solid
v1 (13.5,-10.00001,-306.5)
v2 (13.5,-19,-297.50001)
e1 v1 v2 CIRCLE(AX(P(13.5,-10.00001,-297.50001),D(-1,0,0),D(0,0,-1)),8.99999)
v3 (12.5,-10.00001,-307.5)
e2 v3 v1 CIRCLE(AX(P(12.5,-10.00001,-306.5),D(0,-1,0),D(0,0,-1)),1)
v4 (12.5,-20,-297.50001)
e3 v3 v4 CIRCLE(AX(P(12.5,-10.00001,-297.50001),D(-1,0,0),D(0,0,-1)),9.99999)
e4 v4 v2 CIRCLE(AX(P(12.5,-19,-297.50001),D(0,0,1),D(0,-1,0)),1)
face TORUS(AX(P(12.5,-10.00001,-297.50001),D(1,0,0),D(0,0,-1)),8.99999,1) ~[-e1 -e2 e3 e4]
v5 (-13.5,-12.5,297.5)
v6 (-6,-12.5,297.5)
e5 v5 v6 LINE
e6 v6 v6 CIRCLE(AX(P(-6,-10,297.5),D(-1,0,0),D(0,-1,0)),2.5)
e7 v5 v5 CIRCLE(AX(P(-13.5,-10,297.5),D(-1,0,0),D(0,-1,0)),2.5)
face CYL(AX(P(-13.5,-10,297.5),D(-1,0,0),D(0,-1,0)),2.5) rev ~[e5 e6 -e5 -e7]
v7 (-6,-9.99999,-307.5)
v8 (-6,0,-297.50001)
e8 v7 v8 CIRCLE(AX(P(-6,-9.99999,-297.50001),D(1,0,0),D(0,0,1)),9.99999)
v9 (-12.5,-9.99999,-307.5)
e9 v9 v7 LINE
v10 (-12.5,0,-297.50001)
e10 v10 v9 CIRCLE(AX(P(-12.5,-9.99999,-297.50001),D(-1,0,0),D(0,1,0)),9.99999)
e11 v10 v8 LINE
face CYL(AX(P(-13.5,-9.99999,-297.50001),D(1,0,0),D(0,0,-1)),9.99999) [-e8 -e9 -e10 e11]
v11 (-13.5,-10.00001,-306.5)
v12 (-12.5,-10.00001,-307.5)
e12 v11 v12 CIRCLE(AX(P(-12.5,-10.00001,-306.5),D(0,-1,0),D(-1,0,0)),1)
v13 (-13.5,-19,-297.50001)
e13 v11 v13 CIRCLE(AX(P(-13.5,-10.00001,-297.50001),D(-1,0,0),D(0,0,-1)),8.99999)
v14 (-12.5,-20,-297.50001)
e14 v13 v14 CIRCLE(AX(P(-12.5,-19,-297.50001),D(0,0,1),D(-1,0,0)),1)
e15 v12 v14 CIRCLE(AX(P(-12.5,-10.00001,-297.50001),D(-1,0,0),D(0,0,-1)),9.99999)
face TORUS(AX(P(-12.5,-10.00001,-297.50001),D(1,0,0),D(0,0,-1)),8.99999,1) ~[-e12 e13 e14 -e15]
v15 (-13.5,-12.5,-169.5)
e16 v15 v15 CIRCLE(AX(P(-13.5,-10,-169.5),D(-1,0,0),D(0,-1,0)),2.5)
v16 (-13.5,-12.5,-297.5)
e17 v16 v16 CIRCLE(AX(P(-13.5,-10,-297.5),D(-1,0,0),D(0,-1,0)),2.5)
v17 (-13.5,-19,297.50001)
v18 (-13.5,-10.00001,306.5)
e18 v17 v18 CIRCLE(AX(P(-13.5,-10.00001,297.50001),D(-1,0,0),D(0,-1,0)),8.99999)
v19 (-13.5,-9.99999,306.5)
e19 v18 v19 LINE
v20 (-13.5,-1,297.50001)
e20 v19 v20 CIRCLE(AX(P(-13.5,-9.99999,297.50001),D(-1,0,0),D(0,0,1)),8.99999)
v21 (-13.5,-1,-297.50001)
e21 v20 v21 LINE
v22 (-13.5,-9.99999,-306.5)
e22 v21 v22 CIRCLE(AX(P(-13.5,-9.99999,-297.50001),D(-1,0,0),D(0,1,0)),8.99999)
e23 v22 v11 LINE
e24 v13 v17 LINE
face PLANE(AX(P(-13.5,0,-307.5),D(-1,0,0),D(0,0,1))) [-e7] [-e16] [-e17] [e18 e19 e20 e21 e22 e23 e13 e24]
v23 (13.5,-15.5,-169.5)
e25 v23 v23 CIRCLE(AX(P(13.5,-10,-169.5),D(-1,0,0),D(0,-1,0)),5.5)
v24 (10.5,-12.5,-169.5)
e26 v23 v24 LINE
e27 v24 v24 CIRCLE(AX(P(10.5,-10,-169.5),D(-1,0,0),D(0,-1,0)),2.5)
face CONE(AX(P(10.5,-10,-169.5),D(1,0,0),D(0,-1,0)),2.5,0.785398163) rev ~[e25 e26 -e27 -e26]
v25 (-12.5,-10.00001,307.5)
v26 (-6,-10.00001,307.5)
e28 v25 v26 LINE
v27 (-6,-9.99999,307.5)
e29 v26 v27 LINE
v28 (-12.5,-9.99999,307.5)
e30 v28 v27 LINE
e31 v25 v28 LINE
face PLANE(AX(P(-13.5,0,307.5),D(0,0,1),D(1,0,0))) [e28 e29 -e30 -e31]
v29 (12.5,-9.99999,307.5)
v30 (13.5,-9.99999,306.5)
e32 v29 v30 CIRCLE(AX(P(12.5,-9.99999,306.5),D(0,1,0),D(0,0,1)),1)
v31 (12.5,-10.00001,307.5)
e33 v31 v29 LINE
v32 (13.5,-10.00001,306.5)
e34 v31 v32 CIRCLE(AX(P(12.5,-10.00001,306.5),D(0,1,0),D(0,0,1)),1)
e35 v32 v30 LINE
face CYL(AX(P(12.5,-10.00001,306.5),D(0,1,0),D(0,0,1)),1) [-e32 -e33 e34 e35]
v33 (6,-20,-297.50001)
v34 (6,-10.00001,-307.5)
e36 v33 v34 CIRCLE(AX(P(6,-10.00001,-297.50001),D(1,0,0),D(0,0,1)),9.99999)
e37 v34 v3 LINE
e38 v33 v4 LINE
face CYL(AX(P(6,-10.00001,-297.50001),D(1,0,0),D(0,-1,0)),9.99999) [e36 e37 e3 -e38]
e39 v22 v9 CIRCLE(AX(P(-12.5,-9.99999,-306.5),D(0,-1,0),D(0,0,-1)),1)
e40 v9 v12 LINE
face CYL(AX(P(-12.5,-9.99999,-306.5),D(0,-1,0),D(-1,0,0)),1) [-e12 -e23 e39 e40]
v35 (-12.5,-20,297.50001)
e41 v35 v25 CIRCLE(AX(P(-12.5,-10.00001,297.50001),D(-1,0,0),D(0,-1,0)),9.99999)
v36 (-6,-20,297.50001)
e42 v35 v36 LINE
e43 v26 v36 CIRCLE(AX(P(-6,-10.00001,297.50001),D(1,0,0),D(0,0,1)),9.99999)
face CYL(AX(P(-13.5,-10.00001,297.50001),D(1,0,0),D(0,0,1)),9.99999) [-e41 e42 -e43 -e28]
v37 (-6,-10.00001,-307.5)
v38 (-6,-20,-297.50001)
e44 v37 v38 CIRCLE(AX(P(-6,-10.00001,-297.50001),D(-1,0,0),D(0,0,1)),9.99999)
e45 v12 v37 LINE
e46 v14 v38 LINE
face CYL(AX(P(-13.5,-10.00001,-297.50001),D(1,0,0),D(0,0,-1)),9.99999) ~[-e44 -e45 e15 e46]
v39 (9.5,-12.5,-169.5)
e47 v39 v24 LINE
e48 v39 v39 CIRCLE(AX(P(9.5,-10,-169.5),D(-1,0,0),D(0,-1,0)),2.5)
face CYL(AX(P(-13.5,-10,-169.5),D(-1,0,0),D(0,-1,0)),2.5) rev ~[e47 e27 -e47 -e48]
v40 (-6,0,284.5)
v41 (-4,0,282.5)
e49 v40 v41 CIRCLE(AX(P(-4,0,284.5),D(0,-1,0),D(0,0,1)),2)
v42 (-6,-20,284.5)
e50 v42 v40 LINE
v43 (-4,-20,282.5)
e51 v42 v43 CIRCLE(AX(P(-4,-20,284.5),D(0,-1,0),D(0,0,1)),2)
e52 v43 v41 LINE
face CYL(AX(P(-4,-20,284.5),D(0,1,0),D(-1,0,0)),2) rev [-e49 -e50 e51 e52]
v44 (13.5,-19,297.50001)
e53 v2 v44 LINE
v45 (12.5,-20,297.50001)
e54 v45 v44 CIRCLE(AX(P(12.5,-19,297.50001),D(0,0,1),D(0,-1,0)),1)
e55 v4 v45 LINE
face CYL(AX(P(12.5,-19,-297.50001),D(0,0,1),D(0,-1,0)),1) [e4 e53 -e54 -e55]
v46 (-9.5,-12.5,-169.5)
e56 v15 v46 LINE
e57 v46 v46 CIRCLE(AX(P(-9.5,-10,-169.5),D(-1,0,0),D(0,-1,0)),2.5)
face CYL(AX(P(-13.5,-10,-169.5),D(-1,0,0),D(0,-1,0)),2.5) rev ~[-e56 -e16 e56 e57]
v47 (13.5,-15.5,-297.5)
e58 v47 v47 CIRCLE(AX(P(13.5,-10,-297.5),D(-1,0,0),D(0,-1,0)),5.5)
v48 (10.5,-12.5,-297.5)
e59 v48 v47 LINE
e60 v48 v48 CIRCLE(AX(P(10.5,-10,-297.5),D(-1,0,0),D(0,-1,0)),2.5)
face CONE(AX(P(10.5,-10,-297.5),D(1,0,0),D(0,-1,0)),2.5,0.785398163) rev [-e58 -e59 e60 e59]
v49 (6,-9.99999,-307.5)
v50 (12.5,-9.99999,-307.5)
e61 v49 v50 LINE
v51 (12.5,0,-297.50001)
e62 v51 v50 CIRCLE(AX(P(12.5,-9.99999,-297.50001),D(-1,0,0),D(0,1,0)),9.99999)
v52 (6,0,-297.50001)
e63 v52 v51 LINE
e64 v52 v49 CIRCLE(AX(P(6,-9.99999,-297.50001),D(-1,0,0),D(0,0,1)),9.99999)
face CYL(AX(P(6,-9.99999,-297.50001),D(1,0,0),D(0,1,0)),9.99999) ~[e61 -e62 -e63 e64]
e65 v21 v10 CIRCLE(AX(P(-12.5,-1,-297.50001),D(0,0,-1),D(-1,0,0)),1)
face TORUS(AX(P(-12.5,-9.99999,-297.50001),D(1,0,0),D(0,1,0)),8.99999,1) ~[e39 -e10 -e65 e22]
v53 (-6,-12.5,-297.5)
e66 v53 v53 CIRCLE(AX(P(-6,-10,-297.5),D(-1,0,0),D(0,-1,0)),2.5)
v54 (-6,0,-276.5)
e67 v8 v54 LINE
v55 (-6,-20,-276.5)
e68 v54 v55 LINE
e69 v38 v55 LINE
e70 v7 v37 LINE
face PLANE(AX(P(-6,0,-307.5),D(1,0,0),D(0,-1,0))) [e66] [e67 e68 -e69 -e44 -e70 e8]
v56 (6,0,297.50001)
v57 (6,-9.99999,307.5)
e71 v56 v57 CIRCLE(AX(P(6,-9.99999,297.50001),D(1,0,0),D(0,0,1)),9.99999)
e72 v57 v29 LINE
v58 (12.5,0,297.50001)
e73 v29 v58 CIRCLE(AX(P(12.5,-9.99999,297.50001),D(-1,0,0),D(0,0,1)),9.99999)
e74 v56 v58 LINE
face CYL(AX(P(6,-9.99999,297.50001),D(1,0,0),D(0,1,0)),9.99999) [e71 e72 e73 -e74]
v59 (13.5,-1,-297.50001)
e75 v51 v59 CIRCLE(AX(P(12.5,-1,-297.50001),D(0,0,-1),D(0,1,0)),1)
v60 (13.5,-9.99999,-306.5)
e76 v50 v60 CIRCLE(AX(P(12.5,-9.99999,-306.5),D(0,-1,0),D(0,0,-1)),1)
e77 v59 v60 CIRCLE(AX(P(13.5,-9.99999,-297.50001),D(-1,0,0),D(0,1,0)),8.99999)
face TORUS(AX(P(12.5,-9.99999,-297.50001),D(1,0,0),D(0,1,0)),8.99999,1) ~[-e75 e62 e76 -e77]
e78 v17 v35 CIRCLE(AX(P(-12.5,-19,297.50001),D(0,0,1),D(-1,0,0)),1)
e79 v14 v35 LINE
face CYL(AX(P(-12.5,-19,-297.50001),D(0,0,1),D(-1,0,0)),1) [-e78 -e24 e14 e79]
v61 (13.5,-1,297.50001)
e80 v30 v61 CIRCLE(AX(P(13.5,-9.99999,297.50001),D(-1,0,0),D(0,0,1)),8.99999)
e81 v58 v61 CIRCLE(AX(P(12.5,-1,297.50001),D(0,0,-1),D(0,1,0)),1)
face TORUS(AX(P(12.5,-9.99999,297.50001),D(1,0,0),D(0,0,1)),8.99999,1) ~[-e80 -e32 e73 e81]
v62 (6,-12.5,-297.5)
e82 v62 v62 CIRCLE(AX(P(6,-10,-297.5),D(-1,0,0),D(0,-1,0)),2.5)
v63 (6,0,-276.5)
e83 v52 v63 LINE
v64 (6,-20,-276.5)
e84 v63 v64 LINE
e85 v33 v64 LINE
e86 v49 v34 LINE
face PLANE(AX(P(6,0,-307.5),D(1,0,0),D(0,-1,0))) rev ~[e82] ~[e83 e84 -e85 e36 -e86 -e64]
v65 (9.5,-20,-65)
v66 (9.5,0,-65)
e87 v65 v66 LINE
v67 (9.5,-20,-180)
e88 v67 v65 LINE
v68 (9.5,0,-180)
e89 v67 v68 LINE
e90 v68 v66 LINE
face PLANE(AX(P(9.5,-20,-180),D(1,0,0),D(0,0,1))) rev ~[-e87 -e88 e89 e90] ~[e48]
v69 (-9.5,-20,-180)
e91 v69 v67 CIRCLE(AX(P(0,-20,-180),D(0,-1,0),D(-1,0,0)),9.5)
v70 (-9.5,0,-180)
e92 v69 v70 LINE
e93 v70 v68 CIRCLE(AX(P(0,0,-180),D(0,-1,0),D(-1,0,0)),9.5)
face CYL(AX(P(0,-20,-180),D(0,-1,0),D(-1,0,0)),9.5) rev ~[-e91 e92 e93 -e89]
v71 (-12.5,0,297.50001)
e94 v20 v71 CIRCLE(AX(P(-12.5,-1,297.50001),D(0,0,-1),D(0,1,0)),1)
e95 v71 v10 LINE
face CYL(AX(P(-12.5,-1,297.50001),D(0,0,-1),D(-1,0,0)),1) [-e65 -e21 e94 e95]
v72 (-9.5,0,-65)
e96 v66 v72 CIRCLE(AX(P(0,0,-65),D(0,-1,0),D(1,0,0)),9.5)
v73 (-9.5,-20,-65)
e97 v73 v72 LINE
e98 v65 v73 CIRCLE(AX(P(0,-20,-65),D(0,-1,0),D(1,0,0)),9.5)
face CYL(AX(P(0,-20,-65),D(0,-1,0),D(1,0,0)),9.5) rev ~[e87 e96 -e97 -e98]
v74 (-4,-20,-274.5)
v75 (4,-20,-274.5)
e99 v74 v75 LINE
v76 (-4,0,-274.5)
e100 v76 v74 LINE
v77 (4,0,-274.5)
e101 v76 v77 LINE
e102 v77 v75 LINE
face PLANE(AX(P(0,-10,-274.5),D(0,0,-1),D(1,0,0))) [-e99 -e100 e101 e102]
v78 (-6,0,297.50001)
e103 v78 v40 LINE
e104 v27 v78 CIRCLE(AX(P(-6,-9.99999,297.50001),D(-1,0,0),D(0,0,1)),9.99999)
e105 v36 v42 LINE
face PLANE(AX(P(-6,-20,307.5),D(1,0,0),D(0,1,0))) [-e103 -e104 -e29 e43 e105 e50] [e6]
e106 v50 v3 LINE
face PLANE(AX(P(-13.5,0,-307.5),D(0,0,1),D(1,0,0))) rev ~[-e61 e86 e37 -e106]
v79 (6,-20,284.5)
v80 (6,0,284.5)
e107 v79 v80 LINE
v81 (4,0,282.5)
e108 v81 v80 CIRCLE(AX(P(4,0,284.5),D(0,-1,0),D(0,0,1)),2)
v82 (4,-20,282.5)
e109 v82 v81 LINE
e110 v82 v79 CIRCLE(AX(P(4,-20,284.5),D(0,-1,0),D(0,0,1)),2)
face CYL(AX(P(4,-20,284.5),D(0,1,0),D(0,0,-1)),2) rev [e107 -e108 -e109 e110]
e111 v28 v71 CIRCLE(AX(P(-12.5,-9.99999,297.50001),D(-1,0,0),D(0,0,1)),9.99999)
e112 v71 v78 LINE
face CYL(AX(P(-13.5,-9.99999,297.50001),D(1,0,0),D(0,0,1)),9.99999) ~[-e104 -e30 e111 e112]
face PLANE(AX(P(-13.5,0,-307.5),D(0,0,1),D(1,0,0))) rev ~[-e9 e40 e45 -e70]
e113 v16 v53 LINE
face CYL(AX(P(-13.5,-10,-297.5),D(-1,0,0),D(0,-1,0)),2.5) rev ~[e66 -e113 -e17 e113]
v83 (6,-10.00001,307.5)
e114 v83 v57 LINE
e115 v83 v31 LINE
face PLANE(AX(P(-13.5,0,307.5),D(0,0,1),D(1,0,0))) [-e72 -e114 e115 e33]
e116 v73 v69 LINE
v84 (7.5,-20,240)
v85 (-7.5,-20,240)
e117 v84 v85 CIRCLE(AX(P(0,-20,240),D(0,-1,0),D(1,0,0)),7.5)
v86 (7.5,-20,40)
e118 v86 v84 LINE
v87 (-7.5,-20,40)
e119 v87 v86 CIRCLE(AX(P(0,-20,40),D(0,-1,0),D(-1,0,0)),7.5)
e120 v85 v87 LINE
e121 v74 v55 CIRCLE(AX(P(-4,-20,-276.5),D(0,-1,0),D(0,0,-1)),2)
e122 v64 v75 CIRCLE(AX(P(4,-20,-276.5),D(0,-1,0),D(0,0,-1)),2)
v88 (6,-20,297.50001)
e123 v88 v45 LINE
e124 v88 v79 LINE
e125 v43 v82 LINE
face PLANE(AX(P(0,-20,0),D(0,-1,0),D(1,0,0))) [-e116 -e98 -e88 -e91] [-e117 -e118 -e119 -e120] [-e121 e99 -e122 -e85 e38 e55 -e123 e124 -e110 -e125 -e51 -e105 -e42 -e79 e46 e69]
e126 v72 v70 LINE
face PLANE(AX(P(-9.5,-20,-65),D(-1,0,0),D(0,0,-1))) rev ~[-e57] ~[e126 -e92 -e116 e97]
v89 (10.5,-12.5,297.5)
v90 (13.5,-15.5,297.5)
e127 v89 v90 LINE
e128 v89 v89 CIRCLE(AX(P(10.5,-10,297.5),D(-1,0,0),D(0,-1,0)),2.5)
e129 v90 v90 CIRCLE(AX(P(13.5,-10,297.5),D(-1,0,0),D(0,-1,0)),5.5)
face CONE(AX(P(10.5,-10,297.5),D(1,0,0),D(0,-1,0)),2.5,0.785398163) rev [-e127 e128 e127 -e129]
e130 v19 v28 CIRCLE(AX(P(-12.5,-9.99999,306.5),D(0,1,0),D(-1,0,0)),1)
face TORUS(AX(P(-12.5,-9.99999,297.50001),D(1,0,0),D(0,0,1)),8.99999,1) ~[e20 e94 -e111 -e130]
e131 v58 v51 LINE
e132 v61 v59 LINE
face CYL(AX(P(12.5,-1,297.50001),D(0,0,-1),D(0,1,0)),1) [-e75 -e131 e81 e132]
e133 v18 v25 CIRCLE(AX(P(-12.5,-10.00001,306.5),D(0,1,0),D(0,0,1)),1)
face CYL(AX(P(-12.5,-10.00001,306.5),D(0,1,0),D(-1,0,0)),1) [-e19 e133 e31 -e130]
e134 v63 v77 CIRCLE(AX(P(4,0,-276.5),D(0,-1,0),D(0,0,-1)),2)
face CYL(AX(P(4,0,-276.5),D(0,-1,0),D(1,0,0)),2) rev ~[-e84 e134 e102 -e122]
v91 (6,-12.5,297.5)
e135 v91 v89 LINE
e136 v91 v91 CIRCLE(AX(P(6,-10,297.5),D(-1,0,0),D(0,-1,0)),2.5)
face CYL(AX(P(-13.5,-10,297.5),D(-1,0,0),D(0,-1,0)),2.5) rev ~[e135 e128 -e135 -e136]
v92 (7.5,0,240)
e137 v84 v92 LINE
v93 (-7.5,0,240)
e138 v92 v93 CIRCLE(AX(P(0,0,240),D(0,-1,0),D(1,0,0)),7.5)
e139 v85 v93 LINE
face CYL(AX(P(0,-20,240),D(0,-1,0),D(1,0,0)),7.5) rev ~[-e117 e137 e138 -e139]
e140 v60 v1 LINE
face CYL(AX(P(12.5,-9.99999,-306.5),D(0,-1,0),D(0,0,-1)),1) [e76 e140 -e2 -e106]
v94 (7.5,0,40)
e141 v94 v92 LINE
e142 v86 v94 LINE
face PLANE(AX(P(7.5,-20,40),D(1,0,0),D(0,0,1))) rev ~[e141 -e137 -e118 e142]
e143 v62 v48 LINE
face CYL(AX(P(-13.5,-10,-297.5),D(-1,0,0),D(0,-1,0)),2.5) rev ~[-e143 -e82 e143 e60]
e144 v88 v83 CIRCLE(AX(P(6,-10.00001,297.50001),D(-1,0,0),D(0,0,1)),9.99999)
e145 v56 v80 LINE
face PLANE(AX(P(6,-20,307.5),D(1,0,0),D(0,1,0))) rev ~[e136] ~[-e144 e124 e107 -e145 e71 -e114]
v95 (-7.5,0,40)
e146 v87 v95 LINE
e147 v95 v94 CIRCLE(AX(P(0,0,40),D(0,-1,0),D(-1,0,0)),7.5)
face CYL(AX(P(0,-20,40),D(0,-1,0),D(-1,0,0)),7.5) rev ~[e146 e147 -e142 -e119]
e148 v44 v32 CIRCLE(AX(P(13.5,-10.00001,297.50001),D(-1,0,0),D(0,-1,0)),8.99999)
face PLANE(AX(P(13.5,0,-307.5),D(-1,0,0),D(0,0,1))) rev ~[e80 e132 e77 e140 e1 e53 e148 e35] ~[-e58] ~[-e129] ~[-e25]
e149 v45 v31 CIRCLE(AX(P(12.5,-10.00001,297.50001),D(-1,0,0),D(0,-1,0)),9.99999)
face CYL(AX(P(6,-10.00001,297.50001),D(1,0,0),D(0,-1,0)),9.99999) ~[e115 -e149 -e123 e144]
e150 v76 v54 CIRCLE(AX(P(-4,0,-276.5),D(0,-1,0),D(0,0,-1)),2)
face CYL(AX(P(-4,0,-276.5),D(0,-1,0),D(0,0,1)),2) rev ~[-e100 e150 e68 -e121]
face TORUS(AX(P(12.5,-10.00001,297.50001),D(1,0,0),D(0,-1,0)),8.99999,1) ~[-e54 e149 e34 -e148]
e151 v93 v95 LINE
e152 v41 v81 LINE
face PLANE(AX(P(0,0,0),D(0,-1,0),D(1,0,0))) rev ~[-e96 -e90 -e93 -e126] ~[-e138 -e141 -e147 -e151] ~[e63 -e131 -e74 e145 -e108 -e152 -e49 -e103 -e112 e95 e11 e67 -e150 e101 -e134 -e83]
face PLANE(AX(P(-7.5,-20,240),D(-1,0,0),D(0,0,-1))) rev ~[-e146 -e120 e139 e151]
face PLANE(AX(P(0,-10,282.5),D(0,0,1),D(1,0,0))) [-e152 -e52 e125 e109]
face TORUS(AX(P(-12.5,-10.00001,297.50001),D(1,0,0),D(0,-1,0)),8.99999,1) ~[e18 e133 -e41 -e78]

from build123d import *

# Parameters (mm, degrees)
F0_W      = 27
F0_H      = 615
F1_DEPTH  = 20
F2_W      = 12
F2_H      = 20
F3_DEPTH  = 25
F4_W      = 12
F4_H      = 20
F5_DEPTH  = 33
F6_R      = 9.99999
F7_R      = 2.5
F8_DEPTH  = 30
F10_DEPTH = 25
F11_R     = 2.5
F12_DEPTH = 30
F14_DEPTH = 25
F15_R     = 1
F16_SIZE  = 3
F17_R     = 2


# Not quite as in the source:
# - a fillet or chamfer is up to 0.001 mm smaller than in the source, because OpenCascade refuses the exact size


with BuildPart() as f1:
    # F0 (on Front) → F1 (new body)
    with BuildSketch(Plane.XZ):
        Rectangle(F0_W, F0_H)
    extrude(amount=F1_DEPTH)

    # F2 (on face) → F3 (cut)
    with BuildSketch(Plane.XY.offset(307.5)):
        with Locations((0, -10)):
            Rectangle(F2_W, F2_H)
    extrude(amount=-F3_DEPTH, mode=Mode.SUBTRACT)

    # F4 (on face) → F5 (cut)
    with BuildSketch(Plane(origin=(0, 0, -307.5), x_dir=(1, 0, 0), z_dir=(0, 0, -1))):
        with Locations((0, 10)):
            Rectangle(F4_W, F4_H)
    extrude(amount=-F5_DEPTH, mode=Mode.SUBTRACT)

    # F6 (radius 10 in the source; OpenCascade refuses exactly that, so slightly less here)
    f6_edges = [f1.edges().sort_by_distance(p)[0] for p in [
        (-9.75, 0, -307.5),
        (9.75, 0, -307.5),
        (9.75, -20, -307.5),
        (-9.75, -20, -307.5),
        (-9.75, -20, 307.5),
        (-9.75, 0, 307.5),
        (9.75, 0, 307.5),
        (9.75, -20, 307.5),
    ]]
    fillet(f6_edges, radius=F6_R)

    # F7 (on face) → F8 (cut)
    with BuildSketch(Plane(origin=(-13.5, 0, 0), x_dir=(0, -1, 0), z_dir=(-1, 0, 0))):
        with Locations((10, 297.5)):
            Circle(F7_R)
        with Locations((10, -297.5)):
            Circle(F7_R)
    extrude(amount=-F8_DEPTH, mode=Mode.SUBTRACT)

    # F9 (on face) → F10 (cut)
    with BuildSketch(Plane.XZ.offset(20)):
        with BuildLine():
            ThreePointArc((9.5, -65), (0, -55.5), (-9.5, -65))
            Line((-9.5, -65), (-9.5, -180))
            ThreePointArc((-9.5, -180), (0, -189.5), (9.5, -180))
            Line((9.5, -180), (9.5, -65))
        make_face()
    extrude(amount=-F10_DEPTH, mode=Mode.SUBTRACT)

    # F11 (on face) → F12 (cut)
    with BuildSketch(Plane(origin=(-13.5, 0, 0), x_dir=(0, -1, 0), z_dir=(-1, 0, 0))):
        with Locations((10, -169.5)):
            Circle(F11_R)
    extrude(amount=-F12_DEPTH, mode=Mode.SUBTRACT)

    # F13 (on face) → F14 (cut)
    with BuildSketch(Plane.XZ.offset(20)):
        with BuildLine():
            ThreePointArc((7.5, 240), (0, 247.5), (-7.5, 240))
            Line((-7.5, 240), (-7.5, 40))
            ThreePointArc((-7.5, 40), (0, 32.5), (7.5, 40))
            Line((7.5, 40), (7.5, 240))
        make_face()
    extrude(amount=-F14_DEPTH, mode=Mode.SUBTRACT)

    # F15
    f15_edges = [f1.edges().sort_by_distance(p)[0] for p in [
        (13.5, -20, 0),
        (-13.5, -20, 0),
    ]]
    fillet(f15_edges, radius=F15_R)

    # F16
    f16_edges = [f1.edges().sort_by_distance(p)[0] for p in [
        (13.5, -7.5, 297.5),
        (13.5, -7.5, -169.5),
        (13.5, -7.5, -297.5),
    ]]
    chamfer(f16_edges, length=F16_SIZE)

    # F17
    f17_edges = [f1.edges().sort_by_distance(p)[0] for p in [
        (-6, -10, 282.5),
        (6, -10, 282.5),
        (6, -10, -274.5),
        (-6, -10, -274.5),
    ]]
    fillet(f17_edges, radius=F17_R)


solid = f1.part
